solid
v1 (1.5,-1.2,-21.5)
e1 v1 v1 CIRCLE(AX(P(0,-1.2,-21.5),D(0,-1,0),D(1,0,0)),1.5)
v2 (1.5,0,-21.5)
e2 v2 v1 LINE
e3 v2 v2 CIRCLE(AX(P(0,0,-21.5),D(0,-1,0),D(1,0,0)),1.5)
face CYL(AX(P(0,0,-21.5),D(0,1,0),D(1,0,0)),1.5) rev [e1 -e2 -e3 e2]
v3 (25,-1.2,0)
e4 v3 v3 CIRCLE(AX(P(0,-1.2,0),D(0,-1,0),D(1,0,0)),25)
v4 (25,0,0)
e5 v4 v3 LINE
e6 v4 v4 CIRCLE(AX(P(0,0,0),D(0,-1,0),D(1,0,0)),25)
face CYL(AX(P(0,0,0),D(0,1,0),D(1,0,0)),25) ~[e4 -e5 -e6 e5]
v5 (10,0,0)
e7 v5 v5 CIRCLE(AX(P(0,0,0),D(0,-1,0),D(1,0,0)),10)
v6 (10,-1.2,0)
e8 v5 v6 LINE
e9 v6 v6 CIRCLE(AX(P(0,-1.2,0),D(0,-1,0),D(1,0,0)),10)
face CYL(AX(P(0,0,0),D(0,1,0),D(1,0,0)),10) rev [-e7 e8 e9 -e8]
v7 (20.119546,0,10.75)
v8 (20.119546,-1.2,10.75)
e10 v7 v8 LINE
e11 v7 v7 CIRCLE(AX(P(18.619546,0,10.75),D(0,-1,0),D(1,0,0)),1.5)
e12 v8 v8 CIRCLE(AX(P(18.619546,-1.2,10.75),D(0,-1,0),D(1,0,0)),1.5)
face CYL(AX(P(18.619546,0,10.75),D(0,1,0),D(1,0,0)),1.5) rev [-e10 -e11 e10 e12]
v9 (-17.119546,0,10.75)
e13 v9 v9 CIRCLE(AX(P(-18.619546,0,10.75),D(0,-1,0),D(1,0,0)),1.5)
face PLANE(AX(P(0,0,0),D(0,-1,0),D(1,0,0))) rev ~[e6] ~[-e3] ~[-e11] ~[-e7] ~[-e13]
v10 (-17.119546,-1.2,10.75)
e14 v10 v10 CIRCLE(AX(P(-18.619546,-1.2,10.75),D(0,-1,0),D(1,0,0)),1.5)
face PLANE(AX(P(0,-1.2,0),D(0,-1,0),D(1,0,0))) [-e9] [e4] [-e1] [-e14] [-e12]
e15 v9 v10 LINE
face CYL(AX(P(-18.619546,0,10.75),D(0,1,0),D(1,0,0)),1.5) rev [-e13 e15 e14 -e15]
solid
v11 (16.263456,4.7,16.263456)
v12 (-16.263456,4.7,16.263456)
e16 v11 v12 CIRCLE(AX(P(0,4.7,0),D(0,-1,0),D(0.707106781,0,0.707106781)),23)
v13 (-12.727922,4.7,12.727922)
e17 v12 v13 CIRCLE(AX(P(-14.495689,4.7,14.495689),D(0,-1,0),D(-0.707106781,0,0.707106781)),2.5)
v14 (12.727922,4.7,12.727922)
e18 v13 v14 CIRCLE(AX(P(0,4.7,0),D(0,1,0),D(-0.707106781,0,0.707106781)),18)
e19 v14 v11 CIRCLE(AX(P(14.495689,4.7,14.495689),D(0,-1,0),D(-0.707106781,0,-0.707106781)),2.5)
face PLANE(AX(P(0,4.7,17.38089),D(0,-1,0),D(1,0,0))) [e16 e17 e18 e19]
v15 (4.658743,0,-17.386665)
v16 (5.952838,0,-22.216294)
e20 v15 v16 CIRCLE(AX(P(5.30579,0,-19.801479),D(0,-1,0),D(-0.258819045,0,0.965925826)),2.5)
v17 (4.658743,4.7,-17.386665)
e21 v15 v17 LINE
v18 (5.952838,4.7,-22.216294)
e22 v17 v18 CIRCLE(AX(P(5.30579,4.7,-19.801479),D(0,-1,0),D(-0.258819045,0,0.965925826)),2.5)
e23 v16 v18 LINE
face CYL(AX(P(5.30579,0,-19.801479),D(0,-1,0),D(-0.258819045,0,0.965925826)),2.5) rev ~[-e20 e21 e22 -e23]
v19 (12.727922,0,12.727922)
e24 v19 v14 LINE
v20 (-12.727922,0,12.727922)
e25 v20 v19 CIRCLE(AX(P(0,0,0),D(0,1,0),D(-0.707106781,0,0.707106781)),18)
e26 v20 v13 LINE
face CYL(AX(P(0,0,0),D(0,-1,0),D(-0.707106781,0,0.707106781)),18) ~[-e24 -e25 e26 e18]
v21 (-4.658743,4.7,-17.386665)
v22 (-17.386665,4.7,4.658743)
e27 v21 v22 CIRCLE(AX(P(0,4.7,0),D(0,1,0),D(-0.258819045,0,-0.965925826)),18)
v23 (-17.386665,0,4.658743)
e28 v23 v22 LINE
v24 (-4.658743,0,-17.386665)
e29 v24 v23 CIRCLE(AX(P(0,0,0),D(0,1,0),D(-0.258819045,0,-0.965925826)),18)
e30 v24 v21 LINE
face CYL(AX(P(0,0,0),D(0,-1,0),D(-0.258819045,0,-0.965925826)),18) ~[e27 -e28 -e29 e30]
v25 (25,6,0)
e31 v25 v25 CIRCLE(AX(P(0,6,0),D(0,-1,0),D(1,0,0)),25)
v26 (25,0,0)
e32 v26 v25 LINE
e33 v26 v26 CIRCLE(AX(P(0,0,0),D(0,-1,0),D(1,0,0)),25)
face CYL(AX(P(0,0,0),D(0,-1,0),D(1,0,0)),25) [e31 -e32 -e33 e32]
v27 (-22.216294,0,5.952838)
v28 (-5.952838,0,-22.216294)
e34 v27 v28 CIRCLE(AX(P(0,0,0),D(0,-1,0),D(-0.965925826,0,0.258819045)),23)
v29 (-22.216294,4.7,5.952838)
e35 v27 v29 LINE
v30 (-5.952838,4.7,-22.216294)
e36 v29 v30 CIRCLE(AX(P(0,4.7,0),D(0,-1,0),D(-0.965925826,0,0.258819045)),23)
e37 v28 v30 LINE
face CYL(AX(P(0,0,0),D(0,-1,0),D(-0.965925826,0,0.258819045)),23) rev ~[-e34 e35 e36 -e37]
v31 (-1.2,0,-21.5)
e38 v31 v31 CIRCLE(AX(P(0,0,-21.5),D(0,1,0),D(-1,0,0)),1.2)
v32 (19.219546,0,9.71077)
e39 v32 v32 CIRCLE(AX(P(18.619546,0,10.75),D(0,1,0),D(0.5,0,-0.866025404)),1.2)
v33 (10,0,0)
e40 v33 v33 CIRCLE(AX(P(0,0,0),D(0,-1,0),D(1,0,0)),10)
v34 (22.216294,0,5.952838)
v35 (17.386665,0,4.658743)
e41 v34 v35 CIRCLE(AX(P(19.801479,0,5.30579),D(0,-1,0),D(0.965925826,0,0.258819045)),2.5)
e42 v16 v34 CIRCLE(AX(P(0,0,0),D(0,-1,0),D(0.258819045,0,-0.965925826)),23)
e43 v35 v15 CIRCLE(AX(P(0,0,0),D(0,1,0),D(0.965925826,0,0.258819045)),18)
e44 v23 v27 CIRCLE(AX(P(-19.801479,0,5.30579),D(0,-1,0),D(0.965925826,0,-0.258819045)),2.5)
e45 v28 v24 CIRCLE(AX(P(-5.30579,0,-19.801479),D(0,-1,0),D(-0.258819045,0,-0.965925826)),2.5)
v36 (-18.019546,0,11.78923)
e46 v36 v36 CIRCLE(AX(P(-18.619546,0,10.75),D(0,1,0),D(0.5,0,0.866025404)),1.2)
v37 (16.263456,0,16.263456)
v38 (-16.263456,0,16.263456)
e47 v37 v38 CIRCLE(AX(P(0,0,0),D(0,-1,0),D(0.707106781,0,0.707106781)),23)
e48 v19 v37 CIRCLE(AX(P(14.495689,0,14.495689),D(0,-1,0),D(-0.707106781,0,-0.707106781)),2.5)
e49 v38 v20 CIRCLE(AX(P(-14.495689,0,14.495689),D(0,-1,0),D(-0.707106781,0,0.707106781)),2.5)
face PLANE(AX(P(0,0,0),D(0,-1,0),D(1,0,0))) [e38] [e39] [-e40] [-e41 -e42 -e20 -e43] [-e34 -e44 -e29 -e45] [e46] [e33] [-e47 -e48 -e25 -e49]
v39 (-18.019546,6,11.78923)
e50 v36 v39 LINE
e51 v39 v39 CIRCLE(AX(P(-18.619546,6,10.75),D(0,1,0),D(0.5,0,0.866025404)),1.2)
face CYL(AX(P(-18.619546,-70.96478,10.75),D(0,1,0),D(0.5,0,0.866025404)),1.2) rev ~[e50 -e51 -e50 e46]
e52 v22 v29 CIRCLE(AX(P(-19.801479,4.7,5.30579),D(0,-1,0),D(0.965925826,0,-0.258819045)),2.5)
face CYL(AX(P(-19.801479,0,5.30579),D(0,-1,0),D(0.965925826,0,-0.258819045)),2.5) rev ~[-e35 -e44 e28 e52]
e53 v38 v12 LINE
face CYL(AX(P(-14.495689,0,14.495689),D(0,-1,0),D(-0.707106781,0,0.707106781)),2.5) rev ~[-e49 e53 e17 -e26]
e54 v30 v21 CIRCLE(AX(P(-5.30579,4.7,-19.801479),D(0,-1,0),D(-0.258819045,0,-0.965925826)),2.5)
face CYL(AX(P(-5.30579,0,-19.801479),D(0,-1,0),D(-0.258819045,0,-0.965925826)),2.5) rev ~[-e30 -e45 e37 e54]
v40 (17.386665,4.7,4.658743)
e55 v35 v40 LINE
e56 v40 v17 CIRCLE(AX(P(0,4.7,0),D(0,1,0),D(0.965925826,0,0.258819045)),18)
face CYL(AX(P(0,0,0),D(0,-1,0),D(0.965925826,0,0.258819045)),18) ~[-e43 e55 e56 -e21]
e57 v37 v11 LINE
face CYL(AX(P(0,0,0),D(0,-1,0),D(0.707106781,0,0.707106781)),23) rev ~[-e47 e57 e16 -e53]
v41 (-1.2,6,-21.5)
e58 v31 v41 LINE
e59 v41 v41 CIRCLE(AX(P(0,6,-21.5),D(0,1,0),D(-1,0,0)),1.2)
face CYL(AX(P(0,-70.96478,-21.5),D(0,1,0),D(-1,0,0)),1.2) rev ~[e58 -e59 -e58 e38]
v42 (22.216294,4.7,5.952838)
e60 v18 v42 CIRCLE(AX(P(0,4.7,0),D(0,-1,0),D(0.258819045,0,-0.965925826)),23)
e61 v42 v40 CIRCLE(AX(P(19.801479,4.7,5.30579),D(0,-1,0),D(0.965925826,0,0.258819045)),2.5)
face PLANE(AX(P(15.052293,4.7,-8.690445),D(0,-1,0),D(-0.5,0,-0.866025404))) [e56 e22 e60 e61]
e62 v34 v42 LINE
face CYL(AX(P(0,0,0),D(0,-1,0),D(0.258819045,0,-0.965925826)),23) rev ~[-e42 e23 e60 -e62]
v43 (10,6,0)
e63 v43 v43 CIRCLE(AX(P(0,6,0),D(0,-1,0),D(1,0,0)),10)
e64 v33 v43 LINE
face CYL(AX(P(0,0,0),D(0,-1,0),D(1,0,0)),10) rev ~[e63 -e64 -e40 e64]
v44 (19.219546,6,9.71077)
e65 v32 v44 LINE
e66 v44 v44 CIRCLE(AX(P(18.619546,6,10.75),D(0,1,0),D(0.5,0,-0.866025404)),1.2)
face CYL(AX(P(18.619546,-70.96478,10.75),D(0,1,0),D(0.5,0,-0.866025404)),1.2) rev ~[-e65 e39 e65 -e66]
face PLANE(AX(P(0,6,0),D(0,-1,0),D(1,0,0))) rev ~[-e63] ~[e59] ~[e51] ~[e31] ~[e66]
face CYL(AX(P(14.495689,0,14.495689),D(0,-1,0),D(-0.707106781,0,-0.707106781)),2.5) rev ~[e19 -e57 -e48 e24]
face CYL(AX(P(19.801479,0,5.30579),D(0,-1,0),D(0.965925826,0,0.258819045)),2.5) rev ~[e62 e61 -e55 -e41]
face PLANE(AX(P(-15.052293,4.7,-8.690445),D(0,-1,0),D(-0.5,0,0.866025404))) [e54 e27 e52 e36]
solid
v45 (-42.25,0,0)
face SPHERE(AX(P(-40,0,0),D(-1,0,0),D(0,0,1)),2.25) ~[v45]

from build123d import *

# Parameters (mm, degrees)
F0_R            = 25
F0_R_2          = 10
F1_DEPTH        = 6
F3_DEPTH        = 4.7
F3_COPIES_COUNT = 3
F5_D            = 2.4
F5_COPIES_COUNT = 3
F6_R            = 25
F6_R_2          = 1.5
F6_R_3          = 10
F7_DEPTH        = 1.2


# Not quite as in the source:
# - a pattern or mirror of a feature is missing from the dataset's text; its kind, count and spacing are read off the source's solid


with BuildPart() as f1:
    # F0 (on Front) → F1 (new body)
    with BuildSketch(Plane.XZ):
        Circle(F0_R)
        Circle(F0_R_2, mode=Mode.SUBTRACT)
    extrude(amount=-F1_DEPTH)

    # F2 (on face) → F3 (cut)
    with BuildSketch(Plane.XZ):
        with BuildLine():
            ThreePointArc((-16.2634559673, 16.2634559673), (-16.2634559673, 12.7279220614), (-12.7279220614, 12.7279220614))
            ThreePointArc((-12.7279220614, 12.7279220614), (0, 18), (12.7279220614, 12.7279220614))
            ThreePointArc((12.7279220614, 12.7279220614), (16.2634559673, 12.7279220614), (16.2634559673, 16.2634559673))
            ThreePointArc((16.2634559673, 16.2634559673), (0, 23), (-16.2634559673, 16.2634559673))
        make_face()
    f3 = extrude(amount=-F3_DEPTH, mode=Mode.SUBTRACT)

    # F3_copies: F3 ×3 about axis
    f3_copies_axis = Axis((0, 0, 0), (0, 1, 0))
    for i in range(1, F3_COPIES_COUNT):
        add(f3.rotate(f3_copies_axis, i * 360 / F3_COPIES_COUNT), mode=Mode.SUBTRACT)

    # F5 (through all)
    with Locations(Plane.XZ):
        with Locations((0, -21.5)):
            f5 = Hole(F5_D / 2)

    # F5_copies: F5 ×3 about axis
    f5_copies_axis = Axis((0, 0, 0), (0, 1, 0))
    for i in range(1, F5_COPIES_COUNT):
        add(f5.rotate(f5_copies_axis, i * 360 / F5_COPIES_COUNT), mode=Mode.SUBTRACT)


with BuildPart() as f7:
    # F6 (on face) → F7 (new body)
    with BuildSketch(Plane.XZ):
        Circle(F6_R)
        with Locations((0, -21.5)):
            Circle(F6_R_2, mode=Mode.SUBTRACT)
        with Locations((-18.6195461814, 10.75)):
            Circle(F6_R_2, mode=Mode.SUBTRACT)
        Circle(F6_R_3, mode=Mode.SUBTRACT)
        with Locations((18.6195461814, 10.75)):
            Circle(F6_R_2, mode=Mode.SUBTRACT)
    extrude(amount=F7_DEPTH)


with BuildPart() as f9:
    # F8 (on Front) → F9 (revolve)
    with BuildSketch(Plane.XZ):
        with BuildLine():
            Line((-42.25, 0), (-37.75, 0))
            ThreePointArc((-37.75, 0), (-40, 2.25), (-42.25, 0))
        make_face()
    revolve(axis=Axis((-40, 0, 0), (1, 0, 0)))


solid = Compound([f1.part, f7.part, f9.part])
